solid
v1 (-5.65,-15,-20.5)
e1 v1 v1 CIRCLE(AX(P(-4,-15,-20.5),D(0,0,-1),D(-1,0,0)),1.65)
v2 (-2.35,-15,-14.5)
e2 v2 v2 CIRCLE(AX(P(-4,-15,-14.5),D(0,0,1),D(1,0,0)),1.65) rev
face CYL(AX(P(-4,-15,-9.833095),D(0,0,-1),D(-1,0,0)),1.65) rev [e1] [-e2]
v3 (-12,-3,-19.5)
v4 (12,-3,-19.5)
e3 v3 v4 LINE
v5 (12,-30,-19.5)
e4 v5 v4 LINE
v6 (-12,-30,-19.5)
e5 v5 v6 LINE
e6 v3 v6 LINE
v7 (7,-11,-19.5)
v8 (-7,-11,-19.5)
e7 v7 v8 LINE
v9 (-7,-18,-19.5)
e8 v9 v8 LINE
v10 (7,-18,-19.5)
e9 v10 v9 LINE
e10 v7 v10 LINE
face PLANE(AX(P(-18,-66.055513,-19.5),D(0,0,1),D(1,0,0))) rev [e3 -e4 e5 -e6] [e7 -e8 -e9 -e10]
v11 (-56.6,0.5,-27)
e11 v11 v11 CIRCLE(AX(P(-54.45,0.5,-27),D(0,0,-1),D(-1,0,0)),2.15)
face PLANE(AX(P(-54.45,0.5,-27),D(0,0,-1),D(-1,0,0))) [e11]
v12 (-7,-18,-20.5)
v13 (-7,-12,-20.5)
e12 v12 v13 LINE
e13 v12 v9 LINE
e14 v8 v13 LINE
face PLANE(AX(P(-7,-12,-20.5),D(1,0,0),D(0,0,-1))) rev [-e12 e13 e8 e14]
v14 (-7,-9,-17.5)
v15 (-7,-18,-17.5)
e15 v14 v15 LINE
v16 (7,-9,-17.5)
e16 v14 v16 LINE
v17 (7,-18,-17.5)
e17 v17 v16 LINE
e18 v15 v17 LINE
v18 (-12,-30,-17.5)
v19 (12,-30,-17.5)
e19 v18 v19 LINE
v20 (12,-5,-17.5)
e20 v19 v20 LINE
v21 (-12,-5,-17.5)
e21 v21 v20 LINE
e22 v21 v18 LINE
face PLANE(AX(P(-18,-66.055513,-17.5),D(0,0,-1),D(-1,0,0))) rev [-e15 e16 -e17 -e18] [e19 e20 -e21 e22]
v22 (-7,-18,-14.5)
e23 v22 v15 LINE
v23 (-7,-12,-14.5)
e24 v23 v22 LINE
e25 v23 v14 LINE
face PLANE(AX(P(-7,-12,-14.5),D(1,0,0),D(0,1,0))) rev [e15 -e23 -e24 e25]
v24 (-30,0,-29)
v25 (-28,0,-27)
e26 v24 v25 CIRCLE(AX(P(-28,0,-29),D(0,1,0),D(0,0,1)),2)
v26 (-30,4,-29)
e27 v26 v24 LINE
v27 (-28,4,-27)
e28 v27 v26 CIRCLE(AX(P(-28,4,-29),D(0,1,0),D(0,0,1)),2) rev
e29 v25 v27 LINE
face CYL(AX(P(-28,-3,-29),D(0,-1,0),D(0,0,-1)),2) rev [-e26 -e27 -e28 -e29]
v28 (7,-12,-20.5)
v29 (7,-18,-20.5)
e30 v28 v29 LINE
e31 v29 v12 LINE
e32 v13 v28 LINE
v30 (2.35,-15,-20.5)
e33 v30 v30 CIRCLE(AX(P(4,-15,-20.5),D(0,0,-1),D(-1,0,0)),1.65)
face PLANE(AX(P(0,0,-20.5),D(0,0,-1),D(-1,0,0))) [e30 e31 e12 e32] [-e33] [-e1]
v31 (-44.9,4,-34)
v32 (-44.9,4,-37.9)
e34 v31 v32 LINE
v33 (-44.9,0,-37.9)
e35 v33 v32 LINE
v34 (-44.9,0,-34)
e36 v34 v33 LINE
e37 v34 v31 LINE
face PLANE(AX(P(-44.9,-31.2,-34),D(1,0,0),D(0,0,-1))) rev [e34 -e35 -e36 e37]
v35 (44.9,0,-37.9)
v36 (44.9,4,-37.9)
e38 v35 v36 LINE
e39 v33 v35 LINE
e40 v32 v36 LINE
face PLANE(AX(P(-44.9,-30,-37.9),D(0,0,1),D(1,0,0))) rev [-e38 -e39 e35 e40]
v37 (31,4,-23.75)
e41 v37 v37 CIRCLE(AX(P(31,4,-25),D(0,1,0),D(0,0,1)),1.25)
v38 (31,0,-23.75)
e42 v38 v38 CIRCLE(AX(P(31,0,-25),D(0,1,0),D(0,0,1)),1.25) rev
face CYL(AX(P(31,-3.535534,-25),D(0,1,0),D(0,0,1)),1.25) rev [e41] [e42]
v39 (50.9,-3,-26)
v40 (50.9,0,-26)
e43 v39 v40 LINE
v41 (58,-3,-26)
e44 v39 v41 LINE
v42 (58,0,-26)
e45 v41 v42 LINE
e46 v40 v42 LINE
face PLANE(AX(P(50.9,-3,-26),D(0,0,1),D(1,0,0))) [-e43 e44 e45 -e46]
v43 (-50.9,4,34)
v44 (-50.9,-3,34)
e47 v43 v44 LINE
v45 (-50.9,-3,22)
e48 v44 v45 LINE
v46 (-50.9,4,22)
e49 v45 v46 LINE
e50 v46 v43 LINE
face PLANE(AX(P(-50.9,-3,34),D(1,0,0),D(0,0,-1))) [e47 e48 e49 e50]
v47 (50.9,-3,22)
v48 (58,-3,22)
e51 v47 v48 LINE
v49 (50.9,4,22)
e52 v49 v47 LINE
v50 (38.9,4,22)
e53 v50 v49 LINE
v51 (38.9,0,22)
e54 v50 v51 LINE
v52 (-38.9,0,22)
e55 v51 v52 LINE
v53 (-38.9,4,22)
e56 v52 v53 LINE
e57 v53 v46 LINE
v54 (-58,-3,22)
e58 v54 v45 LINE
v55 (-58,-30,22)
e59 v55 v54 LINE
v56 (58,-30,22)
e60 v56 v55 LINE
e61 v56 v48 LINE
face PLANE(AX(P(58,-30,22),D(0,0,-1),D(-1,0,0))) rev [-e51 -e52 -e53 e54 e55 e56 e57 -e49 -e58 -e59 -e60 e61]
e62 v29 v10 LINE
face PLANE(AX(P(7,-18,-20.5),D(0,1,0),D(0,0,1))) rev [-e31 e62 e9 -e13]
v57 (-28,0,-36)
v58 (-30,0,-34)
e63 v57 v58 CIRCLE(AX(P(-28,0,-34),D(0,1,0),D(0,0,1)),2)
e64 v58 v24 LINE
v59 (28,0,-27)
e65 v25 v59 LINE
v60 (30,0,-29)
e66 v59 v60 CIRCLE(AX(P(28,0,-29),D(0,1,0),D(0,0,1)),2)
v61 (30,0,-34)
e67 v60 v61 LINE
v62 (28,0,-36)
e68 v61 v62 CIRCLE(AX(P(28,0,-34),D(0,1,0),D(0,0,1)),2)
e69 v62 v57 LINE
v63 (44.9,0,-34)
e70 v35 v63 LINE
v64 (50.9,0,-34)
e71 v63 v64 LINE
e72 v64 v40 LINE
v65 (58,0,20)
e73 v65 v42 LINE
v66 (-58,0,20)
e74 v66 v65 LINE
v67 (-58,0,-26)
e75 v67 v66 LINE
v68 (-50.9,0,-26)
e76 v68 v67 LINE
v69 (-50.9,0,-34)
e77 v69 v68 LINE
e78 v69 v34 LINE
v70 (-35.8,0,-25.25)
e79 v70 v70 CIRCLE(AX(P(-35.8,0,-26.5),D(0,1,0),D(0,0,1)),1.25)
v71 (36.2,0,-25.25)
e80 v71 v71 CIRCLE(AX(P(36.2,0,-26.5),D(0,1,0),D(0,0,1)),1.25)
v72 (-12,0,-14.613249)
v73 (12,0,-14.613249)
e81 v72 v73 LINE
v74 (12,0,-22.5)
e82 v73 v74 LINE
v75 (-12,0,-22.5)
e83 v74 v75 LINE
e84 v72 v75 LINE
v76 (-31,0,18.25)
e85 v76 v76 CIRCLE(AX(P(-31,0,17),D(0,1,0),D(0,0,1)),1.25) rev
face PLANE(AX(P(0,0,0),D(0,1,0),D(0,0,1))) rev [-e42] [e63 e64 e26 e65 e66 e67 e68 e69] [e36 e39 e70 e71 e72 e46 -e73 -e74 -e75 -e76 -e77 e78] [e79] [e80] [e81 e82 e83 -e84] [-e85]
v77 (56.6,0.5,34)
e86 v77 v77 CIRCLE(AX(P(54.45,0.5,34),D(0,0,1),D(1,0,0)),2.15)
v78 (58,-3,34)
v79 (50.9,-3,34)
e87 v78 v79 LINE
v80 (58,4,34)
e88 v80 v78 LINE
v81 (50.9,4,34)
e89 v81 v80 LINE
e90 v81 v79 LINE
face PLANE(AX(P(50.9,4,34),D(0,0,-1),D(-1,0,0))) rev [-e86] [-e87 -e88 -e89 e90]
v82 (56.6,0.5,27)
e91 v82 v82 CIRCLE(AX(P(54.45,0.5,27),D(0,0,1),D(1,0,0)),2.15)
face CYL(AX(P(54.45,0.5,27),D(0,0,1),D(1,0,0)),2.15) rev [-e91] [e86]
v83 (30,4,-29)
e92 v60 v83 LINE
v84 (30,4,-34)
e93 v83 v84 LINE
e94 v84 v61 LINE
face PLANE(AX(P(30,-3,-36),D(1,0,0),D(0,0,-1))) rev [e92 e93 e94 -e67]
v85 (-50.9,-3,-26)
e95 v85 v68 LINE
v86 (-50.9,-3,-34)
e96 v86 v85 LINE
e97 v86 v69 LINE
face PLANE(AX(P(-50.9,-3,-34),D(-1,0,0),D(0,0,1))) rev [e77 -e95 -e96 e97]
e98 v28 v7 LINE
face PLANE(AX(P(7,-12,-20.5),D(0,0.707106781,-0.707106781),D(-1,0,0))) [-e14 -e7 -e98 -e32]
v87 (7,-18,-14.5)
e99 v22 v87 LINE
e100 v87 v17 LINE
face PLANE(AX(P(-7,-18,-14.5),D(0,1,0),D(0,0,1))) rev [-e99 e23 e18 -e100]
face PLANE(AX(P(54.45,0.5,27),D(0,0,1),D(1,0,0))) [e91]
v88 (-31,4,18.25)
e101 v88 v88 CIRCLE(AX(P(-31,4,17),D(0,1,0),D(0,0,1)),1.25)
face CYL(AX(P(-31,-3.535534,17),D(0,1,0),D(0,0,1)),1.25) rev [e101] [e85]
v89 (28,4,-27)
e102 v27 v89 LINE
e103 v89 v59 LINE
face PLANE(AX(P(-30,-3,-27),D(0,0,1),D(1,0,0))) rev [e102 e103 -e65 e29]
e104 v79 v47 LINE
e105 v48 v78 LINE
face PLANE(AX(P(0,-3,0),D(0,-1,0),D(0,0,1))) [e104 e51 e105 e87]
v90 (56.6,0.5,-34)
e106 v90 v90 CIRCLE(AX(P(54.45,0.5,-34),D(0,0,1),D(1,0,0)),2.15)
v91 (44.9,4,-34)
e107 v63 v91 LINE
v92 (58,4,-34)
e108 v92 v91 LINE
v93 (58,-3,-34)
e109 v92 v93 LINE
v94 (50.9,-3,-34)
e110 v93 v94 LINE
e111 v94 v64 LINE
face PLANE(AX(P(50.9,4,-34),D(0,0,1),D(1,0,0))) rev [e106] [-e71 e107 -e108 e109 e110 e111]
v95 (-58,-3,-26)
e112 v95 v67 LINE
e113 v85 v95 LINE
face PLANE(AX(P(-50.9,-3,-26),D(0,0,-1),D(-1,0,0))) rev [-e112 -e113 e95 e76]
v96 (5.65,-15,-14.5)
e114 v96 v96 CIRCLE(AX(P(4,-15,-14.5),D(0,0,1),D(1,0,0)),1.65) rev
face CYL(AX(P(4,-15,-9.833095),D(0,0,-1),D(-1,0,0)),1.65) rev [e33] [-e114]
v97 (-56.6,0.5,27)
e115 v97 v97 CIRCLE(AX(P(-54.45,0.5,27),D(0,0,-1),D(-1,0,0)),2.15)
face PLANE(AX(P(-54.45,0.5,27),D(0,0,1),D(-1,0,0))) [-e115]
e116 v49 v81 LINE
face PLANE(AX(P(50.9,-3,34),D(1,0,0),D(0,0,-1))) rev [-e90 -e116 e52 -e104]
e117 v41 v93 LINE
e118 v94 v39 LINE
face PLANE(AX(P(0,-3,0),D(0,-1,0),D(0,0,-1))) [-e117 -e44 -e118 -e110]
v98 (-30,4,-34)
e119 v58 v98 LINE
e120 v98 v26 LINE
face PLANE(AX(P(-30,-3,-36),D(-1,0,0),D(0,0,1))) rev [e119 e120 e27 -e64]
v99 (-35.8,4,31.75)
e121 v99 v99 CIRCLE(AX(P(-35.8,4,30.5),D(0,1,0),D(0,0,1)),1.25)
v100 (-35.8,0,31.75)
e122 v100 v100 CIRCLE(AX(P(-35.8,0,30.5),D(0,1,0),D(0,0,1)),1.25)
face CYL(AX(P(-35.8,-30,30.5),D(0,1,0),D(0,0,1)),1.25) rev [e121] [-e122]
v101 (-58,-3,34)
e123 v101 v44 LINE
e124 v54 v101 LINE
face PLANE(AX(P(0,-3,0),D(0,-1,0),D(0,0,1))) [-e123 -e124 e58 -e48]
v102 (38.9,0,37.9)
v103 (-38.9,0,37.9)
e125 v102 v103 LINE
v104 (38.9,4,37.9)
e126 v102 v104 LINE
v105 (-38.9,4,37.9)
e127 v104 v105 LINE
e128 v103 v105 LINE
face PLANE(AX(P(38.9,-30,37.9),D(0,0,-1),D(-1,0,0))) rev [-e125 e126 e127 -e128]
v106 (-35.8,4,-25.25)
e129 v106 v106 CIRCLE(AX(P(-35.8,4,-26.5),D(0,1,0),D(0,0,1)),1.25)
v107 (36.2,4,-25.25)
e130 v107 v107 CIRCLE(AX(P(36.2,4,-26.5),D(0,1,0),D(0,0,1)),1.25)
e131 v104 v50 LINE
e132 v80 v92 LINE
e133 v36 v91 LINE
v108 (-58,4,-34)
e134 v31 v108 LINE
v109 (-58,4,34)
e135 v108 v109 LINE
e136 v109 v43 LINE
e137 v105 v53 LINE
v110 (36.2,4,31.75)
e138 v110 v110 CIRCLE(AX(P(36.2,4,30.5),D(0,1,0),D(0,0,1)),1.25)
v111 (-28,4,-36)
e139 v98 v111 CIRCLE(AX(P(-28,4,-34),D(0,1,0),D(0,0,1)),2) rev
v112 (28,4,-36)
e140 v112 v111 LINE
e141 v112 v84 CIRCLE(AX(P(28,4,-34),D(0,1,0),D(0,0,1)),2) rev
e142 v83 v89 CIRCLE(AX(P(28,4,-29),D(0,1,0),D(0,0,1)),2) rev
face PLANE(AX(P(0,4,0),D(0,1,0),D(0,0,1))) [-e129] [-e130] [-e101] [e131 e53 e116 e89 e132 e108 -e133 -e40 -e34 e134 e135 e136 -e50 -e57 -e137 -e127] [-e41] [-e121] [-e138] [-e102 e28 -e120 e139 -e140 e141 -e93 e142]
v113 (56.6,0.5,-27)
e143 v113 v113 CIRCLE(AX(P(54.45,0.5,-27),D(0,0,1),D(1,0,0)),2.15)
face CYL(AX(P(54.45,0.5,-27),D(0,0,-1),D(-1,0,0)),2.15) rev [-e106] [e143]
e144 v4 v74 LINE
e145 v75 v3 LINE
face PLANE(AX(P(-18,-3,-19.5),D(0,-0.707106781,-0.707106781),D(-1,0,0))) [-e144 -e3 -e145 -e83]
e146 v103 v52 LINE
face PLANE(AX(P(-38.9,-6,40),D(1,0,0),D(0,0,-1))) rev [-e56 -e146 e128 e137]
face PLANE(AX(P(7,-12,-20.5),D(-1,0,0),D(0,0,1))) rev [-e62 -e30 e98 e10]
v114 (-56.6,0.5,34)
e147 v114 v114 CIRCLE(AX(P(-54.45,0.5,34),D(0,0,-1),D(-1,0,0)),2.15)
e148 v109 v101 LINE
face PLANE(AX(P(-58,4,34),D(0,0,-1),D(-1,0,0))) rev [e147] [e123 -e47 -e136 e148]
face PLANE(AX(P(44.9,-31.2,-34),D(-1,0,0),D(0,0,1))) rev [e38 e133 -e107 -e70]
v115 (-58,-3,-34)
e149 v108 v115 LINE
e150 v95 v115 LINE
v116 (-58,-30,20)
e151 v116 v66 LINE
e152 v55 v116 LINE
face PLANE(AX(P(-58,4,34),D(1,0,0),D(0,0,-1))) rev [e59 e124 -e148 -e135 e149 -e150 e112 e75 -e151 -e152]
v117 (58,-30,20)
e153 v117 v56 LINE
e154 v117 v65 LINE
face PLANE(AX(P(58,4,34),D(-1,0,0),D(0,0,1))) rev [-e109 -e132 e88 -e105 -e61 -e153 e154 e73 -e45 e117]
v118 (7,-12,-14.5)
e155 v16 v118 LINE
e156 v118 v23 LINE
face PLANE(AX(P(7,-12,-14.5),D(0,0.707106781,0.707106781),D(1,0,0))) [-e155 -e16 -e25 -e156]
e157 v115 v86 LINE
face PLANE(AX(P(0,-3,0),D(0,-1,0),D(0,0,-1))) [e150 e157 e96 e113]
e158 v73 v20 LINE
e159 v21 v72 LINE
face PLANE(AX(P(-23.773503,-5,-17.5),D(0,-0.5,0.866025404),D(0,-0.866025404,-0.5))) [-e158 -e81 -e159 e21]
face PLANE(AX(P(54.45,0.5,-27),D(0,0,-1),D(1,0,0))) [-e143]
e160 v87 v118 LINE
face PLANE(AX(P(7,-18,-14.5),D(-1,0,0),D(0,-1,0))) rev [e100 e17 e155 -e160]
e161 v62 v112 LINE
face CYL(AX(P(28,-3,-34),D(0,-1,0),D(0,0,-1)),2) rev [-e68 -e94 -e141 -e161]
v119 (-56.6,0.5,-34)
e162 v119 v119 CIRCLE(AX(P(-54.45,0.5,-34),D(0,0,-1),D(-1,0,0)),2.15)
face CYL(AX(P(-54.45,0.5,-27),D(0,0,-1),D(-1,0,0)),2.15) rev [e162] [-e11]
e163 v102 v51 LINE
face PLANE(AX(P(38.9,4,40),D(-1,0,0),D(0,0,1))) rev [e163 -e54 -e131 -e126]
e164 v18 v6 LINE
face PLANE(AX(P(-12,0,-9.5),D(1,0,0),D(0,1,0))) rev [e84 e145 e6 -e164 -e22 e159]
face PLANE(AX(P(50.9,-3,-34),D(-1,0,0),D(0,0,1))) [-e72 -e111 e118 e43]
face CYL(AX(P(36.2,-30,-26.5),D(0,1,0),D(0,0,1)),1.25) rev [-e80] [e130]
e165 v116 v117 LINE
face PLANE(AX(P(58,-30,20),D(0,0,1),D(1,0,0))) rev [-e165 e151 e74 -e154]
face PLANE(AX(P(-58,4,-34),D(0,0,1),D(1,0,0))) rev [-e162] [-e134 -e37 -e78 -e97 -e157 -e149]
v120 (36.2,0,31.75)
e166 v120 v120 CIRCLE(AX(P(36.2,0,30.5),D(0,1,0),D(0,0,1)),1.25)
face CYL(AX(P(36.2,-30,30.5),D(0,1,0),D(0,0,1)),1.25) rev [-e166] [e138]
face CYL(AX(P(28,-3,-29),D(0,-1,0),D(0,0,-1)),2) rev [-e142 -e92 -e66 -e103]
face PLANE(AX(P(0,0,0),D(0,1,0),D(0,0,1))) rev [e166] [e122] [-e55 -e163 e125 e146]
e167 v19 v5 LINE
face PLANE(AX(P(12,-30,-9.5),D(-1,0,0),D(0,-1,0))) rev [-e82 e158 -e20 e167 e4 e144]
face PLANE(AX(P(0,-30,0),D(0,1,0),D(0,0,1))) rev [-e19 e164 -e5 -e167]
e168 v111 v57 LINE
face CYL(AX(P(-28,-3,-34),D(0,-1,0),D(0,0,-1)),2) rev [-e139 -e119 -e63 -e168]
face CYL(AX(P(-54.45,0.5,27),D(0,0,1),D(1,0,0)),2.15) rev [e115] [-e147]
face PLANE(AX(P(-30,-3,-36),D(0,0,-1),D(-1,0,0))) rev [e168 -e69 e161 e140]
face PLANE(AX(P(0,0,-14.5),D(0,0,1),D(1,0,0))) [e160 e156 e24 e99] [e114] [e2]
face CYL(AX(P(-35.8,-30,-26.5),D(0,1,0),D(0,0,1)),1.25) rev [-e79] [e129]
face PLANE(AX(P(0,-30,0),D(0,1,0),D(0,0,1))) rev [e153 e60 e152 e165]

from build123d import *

# Parameters (mm, degrees)
BOSS_EXTRUDE1_DEPTH             = 4
SKETCH3_W                       = 7.1
SKETCH3_H                       = 8
BOSS_EXTRUDE3_DEPTH             = 3
SKETCH4_R                       = 2.15
CUT_EXTRUDE1_DEPTH              = 7
MIRROR2_COPY_1_SKETCH_W         = 7.1
MIRROR2_COPY_1_SKETCH_H         = 8
MIRROR2_COPY_1_DEPTH            = 3
MIRROR2_COPY_2_SKETCH_R         = 2.15
MIRROR2_COPY_2_DEPTH            = 7
SKETCH5_W                       = 60
SKETCH5_H                       = 9
CUT_EXTRUDE2_DEPTH              = 72.37226352
FILLET1_R                       = 2
SKETCH7_W                       = 101.8
SKETCH7_H                       = 1
CUT_EXTRUDE3_DEPTH              = 72.37226352
SKETCH8_W                       = 116
SKETCH8_H                       = 2
BOSS_EXTRUDE4_DEPTH             = 30
SKETCH9_W                       = 12
SKETCH9_H                       = 18
CUT_EXTRUDE4_DEPTH              = 10
SKETCH10_W                      = 7.1
SKETCH10_H                      = 4
BOSS_EXTRUDE5_DEPTH             = 3
SKETCH12_W                      = 1.5
SKETCH12_H                      = 4
BOSS_EXTRUDE6_DEPTH             = 2
SKETCH13_W                      = 36
SKETCH13_H                      = 2
BOSS_EXTRUDE7_DEPTH             = 30
SKETCH14_W                      = 1.5
SKETCH14_H                      = 4
BOSS_EXTRUDE8_DEPTH             = 1
BOSS_EXTRUDE9_REACH             = 79.055
BOSS_EXTRUDE9_DIRECTION_2_REACH = 79.055
SKETCH16_W                      = 20
SKETCH16_H                      = 28
SKETCH16_W_2                    = 14.6
SKETCH16_H_2                    = 9.2
BOSS_EXTRUDE10_DEPTH            = 2.6
SKETCH17_W                      = 12
SKETCH17_H                      = 18
CUT_EXTRUDE5_DEPTH              = 78.054785705
SKETCH18_W                      = 6
SKETCH18_H                      = 6
CUT_EXTRUDE6_DEPTH              = 79.759380394
SKETCH22_R                      = 1.25
CUT_EXTRUDE7_DEPTH              = 4
SKETCH25_W                      = 6
SKETCH25_H                      = 30
CUT_EXTRUDE11_DEPTH             = 10
CUT_EXTRUDE12_DEPTH             = 78.810282097
CUT_EXTRUDE12_DEPTH_BACK        = 78.810282097
SKETCH26_W                      = 6.843369225
SKETCH26_H                      = 31.263319976
SKETCH26_W_2                    = 6.53419365
SKETCH26_H_2                    = 28.524331859
SKETCH27_R                      = 1.25
CUT_EXTRUDE13_DEPTH             = 79.230428862
SKETCH28_W                      = 89.8
SKETCH28_H                      = 0.6
SKETCH28_W_2                    = 77.8
CUT_EXTRUDE14_DEPTH             = 79.230428862
CHAMFER1_SIZE                   = 2
SKETCH29_W                      = 20
SKETCH29_H                      = 28
CUT_EXTRUDE15_DEPTH             = 17.4
CUT_EXTRUDE16_DEPTH             = 2
SKETCH30_W                      = 89.8
SKETCH30_H                      = 1.5
SKETCH30_W_2                    = 77.8
CUT_EXTRUDE17_DEPTH             = 78.925348892
SKETCH32_W                      = 14
SKETCH32_H                      = 6
BOSS_EXTRUDE11_DEPTH            = 1
CHAMFER2_SIZE                   = 1
SKETCH34_W                      = 14
SKETCH34_H                      = 6
BOSS_EXTRUDE12_DEPTH            = 3
CHAMFER3_SIZE                   = 3
SKETCH33_R                      = 1.65
CUT_EXTRUDE18_DEPTH             = 6
CHAMFER4_SIZE                   = 3


with BuildPart() as part:
    # Sketch1 → Boss-Extrude1 (new body)
    with BuildSketch(Plane(origin=(0, 0, 0), x_dir=(1, 0, 0), z_dir=(0, 1, 0))):
        Polygon((-58, -34), (-50.9, -34), (-50.9, -41), (50.9, -41), (50.9, -34), (58, -34), (58, 34), (50.9, 34), (50.9, 41), (-50.9, 41), (-50.9, 34), (-58, 34), align=None)
    extrude(amount=BOSS_EXTRUDE1_DEPTH)

    # Sketch3 → Boss-Extrude3 (add)
    with BuildSketch(Plane.XZ):
        with Locations((-54.45, -30)):
            Rectangle(SKETCH3_W, SKETCH3_H)
    boss_extrude3 = extrude(amount=BOSS_EXTRUDE3_DEPTH)

    # Sketch4 → Cut-Extrude1 (cut)
    with BuildSketch(Plane(origin=(0, 0, -34), x_dir=(-1, 0, 0), z_dir=(0, 0, -1))):
        with Locations((54.45, 0.5)):
            Circle(SKETCH4_R)
    cut_extrude1 = extrude(amount=-CUT_EXTRUDE1_DEPTH, mode=Mode.SUBTRACT)

    # Mirror1: Boss-Extrude3, Cut-Extrude1 across plane
    add(boss_extrude3.mirror(Plane(origin=(0, 0, 0), x_dir=(0, 0, 1), z_dir=(1, 0, 0))))
    add(cut_extrude1.mirror(Plane(origin=(0, 0, 0), x_dir=(0, 0, 1), z_dir=(1, 0, 0))), mode=Mode.SUBTRACT)

    # Mirror2: Boss-Extrude3, Cut-Extrude1 across plane
    add(boss_extrude3.mirror(Plane.XY))
    add(cut_extrude1.mirror(Plane.XY), mode=Mode.SUBTRACT)

    # Mirror2 copy 1 sketch → Mirror2 copy 1 (add)
    with BuildSketch(Plane(origin=(0, 0, 0), x_dir=(-1, 0, 0), z_dir=(0, -1, 0))):
        with Locations((-54.45, -30)):
            Rectangle(MIRROR2_COPY_1_SKETCH_W, MIRROR2_COPY_1_SKETCH_H)
    extrude(amount=MIRROR2_COPY_1_DEPTH)

    # Mirror2 copy 2 sketch → Mirror2 copy 2 (cut)
    with BuildSketch(Plane.XY.offset(34)):
        with Locations((54.45, 0.5)):
            Circle(MIRROR2_COPY_2_SKETCH_R)
    extrude(amount=-MIRROR2_COPY_2_DEPTH, mode=Mode.SUBTRACT)

    # Sketch5 → Cut-Extrude2 (cut, through all)
    with BuildSketch(Plane(origin=(0, 4, 0), x_dir=(1, 0, 0), z_dir=(0, 1, 0))):
        with Locations((0, 31.5)):
            Rectangle(SKETCH5_W, SKETCH5_H)
    extrude(amount=-CUT_EXTRUDE2_DEPTH, mode=Mode.SUBTRACT)

    # Fillet1
    fillet1_edges = [part.edges().sort_by_distance(p)[0] for p in [
        (-30, 2, -27),
        (-30, 2, -36),
        (30, 2, -36),
        (30, 2, -27),
    ]]
    fillet(fillet1_edges, radius=FILLET1_R)

    # Sketch7 → Cut-Extrude3 (cut, through all)
    with BuildSketch(Plane(origin=(0, 4, 0), x_dir=(1, 0, 0), z_dir=(0, 1, 0))):
        with Locations((0, 40.5)):
            Rectangle(SKETCH7_W, SKETCH7_H)
        with Locations((0, -40.5)):
            Rectangle(SKETCH7_W, SKETCH7_H)
    extrude(amount=-CUT_EXTRUDE3_DEPTH, mode=Mode.SUBTRACT)

    # Sketch8 → Boss-Extrude4 (add)
    with BuildSketch(Plane.XZ):
        with Locations((0, 21)):
            Rectangle(SKETCH8_W, SKETCH8_H)
    extrude(amount=BOSS_EXTRUDE4_DEPTH)

    # Sketch9 → Cut-Extrude4 (cut)
    with BuildSketch(Plane(origin=(0, 4, 0), x_dir=(1, 0, 0), z_dir=(0, 1, 0))):
        with Locations((-44.9, -31)):
            Rectangle(SKETCH9_W, SKETCH9_H)
    extrude(amount=-CUT_EXTRUDE4_DEPTH, mode=Mode.SUBTRACT)

    # Sketch10 → Boss-Extrude5 (add)
    with BuildSketch(Plane.XZ.offset(3)):
        with Locations((-54.45, 24)):
            Rectangle(SKETCH10_W, SKETCH10_H)
        with Locations((54.45, 24)):
            Rectangle(SKETCH10_W, SKETCH10_H)
    extrude(amount=-BOSS_EXTRUDE5_DEPTH)

    # Sketch12 → Boss-Extrude6 (add)
    # profile 1 of 2: a face of its own
    with BuildSketch(Plane.ZY.offset(51)):
        Polygon((22, -5.8), (22, -16.2), (24.7, -13.5), (24.7, -8.5), align=None)
        with Locations((23.35, -11)):
            Rectangle(SKETCH12_W, SKETCH12_H, mode=Mode.SUBTRACT)
    # profile 2 of 2: a face of its own
    with BuildSketch(Plane.ZY.offset(51)):
        Polygon((22, -20.8), (22, -31.2), (24.7, -28.5), (24.7, -23.5), align=None)
        with Locations((23.35, -26)):
            Rectangle(SKETCH12_W, SKETCH12_H, mode=Mode.SUBTRACT)
    boss_extrude6 = extrude(amount=-BOSS_EXTRUDE6_DEPTH)

    # Mirror3: Boss-Extrude6 across plane
    add(boss_extrude6.mirror(Plane(origin=(-44.9, 0, 0), x_dir=(0, 0, 1), z_dir=(1, 0, 0))))

    # Sketch13 → Boss-Extrude7 (add)
    with BuildSketch(Plane.XZ):
        with Locations((0, -18.5)):
            Rectangle(SKETCH13_W, SKETCH13_H)
    extrude(amount=BOSS_EXTRUDE7_DEPTH)

    # Boss-Extrude9: up to this face of the body (flat: up to its plane)
    boss_extrude9_end = Plane(part.part.faces().sort_by_distance((-18, -15, -18.5))[0])
    # Sketch15 → Boss-Extrude9 (add, up to the picked face)
    with BuildSketch(Plane(origin=(0, 0, 0), x_dir=(0, 0, -1), z_dir=(1, 0, 0)), mode=Mode.PRIVATE) as boss_extrude9_sk1:
        Polygon((17.5, 0), (17.5, -5), (14.613248654, 0), align=None)
    boss_extrude9_tool1 = split(extrude(boss_extrude9_sk1.sketch, amount=-BOSS_EXTRUDE9_REACH, mode=Mode.PRIVATE), bisect_by=boss_extrude9_end, keep=Keep.BOTH, mode=Mode.PRIVATE)
    add(boss_extrude9_tool1.solids().sort_by(Axis((0, -1.666667, -16.53775), (-1, 0, 0)))[0])

    # Boss-Extrude9 direction 2: up to this face of the body (flat: up to its plane)
    boss_extrude9_direction_2_end = Plane(part.part.faces().sort_by_distance((18, -15, -18.5))[0])
    # Sketch15 → Boss-Extrude9 direction 2 (add, up to the picked face)
    with BuildSketch(Plane(origin=(0, 0, 0), x_dir=(0, 0, -1), z_dir=(1, 0, 0)), mode=Mode.PRIVATE) as boss_extrude9_direction_2_sk1:
        Polygon((17.5, 0), (17.5, -5), (14.613248654, 0), align=None)
    boss_extrude9_direction_2_tool1 = split(extrude(boss_extrude9_direction_2_sk1.sketch, amount=BOSS_EXTRUDE9_DIRECTION_2_REACH, mode=Mode.PRIVATE), bisect_by=boss_extrude9_direction_2_end, keep=Keep.BOTH, mode=Mode.PRIVATE)
    add(boss_extrude9_direction_2_tool1.solids().sort_by(Axis((0, -1.666667, -16.53775), (1, 0, 0)))[0])

    # Sketch16 → Boss-Extrude10 (add)
    with BuildSketch(Plane.XY.offset(40)):
        with Locations((28, -14)):
            Rectangle(SKETCH16_W, SKETCH16_H)
        with Locations((28, -20.4)):
            Rectangle(SKETCH16_W_2, SKETCH16_H_2, mode=Mode.SUBTRACT)
    extrude(amount=-BOSS_EXTRUDE10_DEPTH)

    # Sketch17 → Cut-Extrude5 (cut, through all)
    with BuildSketch(Plane.XZ):
        with Locations((44.9, 31)):
            Rectangle(SKETCH17_W, SKETCH17_H)
    extrude(amount=-CUT_EXTRUDE5_DEPTH, mode=Mode.SUBTRACT)

    # Sketch18 → Cut-Extrude6 (cut, through all)
    with BuildSketch(Plane(origin=(0, 4, 0), x_dir=(1, 0, 0), z_dir=(0, 1, 0))):
        with Locations((47.9, 37)):
            Rectangle(SKETCH18_W, SKETCH18_H)
        with Locations((-47.9, 37)):
            Rectangle(SKETCH18_W, SKETCH18_H)
    extrude(amount=-CUT_EXTRUDE6_DEPTH, mode=Mode.SUBTRACT)

    # Sketch22 → Cut-Extrude7 (cut)
    with BuildSketch(Plane(origin=(0, 4, 0), x_dir=(1, 0, 0), z_dir=(0, 1, 0))):
        with Locations(Location((31, 25, 0), (0, 0, 270))):
            Circle(SKETCH22_R)
        with Locations(Location((-31, -17, 0), (0, 0, 270))):
            Circle(SKETCH22_R)
    extrude(amount=-CUT_EXTRUDE7_DEPTH, mode=Mode.SUBTRACT)

    # Sketch25 → Cut-Extrude11 (cut)
    with BuildSketch(Plane(origin=(0, 0, -19.5), x_dir=(-1, 0, 0), z_dir=(0, 0, -1))):
        with Locations((-15, -15)):
            Rectangle(SKETCH25_W, SKETCH25_H)
        with Locations((15, -15)):
            Rectangle(SKETCH25_W, SKETCH25_H)
    extrude(amount=-CUT_EXTRUDE11_DEPTH, mode=Mode.SUBTRACT)

    # Sketch26 → Cut-Extrude12 (cut, two sides: drawn at the far end of the back side and taken through both)
    with BuildSketch(Plane.ZY.offset(1).offset(-CUT_EXTRUDE12_DEPTH_BACK)):
        with Locations((-23.779868126, -20.73082856)):
            Rectangle(SKETCH26_W, SKETCH26_H)
        with Locations((25.267096825, -20.06216593)):
            Rectangle(SKETCH26_W_2, SKETCH26_H_2)
    extrude(amount=CUT_EXTRUDE12_DEPTH + CUT_EXTRUDE12_DEPTH_BACK, mode=Mode.SUBTRACT)

    # Sketch27 → Cut-Extrude13 (cut, through all)
    with BuildSketch(Plane(origin=(0, 4, 0), x_dir=(1, 0, 0), z_dir=(0, 1, 0))):
        with Locations(Location((-35.8, 26.5, 0), (0, 0, 270))):
            Circle(SKETCH27_R)
        with Locations(Location((-35.8, -30.5, 0), (0, 0, 270))):
            Circle(SKETCH27_R)
        with Locations(Location((36.2, -30.5, 0), (0, 0, 270))):
            Circle(SKETCH27_R)
        with Locations(Location((36.2, 26.5, 0), (0, 0, 270))):
            Circle(SKETCH27_R)
    extrude(amount=-CUT_EXTRUDE13_DEPTH, mode=Mode.SUBTRACT)

    # Sketch28 → Cut-Extrude14 (cut, through all)
    with BuildSketch(Plane(origin=(0, 4, 0), x_dir=(1, 0, 0), z_dir=(0, 1, 0))):
        with Locations((0, 39.7)):
            Rectangle(SKETCH28_W, SKETCH28_H)
        with Locations((0, -39.7)):
            Rectangle(SKETCH28_W_2, SKETCH28_H)
    extrude(amount=-CUT_EXTRUDE14_DEPTH, mode=Mode.SUBTRACT)

    # Chamfer1
    chamfer1_edges = [part.edges().sort_by_distance(p)[0] for p in [
        (28, 0, 37.4),
    ]]
    chamfer(chamfer1_edges, length=CHAMFER1_SIZE)

    # Sketch29 → Cut-Extrude15 (cut)
    with BuildSketch(Plane.XY.offset(39.4)):
        with Locations((28, -14)):
            Rectangle(SKETCH29_W, SKETCH29_H)
    extrude(amount=-CUT_EXTRUDE15_DEPTH, mode=Mode.SUBTRACT)

    # Sketch30 → Cut-Extrude17 (cut, through all)
    with BuildSketch(Plane(origin=(0, 4, 0), x_dir=(1, 0, 0), z_dir=(0, 1, 0))):
        with Locations((0, 38.65)):
            Rectangle(SKETCH30_W, SKETCH30_H)
        with Locations((0, -38.65)):
            Rectangle(SKETCH30_W_2, SKETCH30_H)
    extrude(amount=-CUT_EXTRUDE17_DEPTH, mode=Mode.SUBTRACT)

    # Sketch32 → Boss-Extrude11 (add)
    with BuildSketch(Plane(origin=(0, 0, -19.5), x_dir=(-1, 0, 0), z_dir=(0, 0, -1))):
        with Locations((0, -15)):
            Rectangle(SKETCH32_W, SKETCH32_H)
    extrude(amount=BOSS_EXTRUDE11_DEPTH)

    # Chamfer2
    chamfer2_edges = [part.edges().sort_by_distance(p)[0] for p in [
        (0, -12, -19.5),
    ]]
    chamfer(chamfer2_edges, length=CHAMFER2_SIZE - 0.0001)  # a hair under: the kernel refuses the full size

    # Sketch34 → Boss-Extrude12 (add)
    with BuildSketch(Plane.XY.offset(-17.5)):
        with Locations((0, -15)):
            Rectangle(SKETCH34_W, SKETCH34_H)
    extrude(amount=BOSS_EXTRUDE12_DEPTH)

    # Chamfer3
    chamfer3_edges = [part.edges().sort_by_distance(p)[0] for p in [
        (0, -12, -17.5),
    ]]
    chamfer(chamfer3_edges, length=CHAMFER3_SIZE - 0.0001)  # a hair under: the kernel refuses the full size

    # Sketch33 → Cut-Extrude18 (cut)
    with BuildSketch(Plane(origin=(0, 0, -20.5), x_dir=(-1, 0, 0), z_dir=(0, 0, -1))):
        with Locations((4, -15)):
            Circle(SKETCH33_R)
        with Locations((-4, -15)):
            Circle(SKETCH33_R)
    extrude(amount=-CUT_EXTRUDE18_DEPTH, mode=Mode.SUBTRACT)

    # Chamfer4
    chamfer4_edges = [part.edges().sort_by_distance(p)[0] for p in [
        (0, 0, -19.5),
    ]]
    chamfer(chamfer4_edges, length=CHAMFER4_SIZE)


with BuildPart() as body_2:
    # Sketch14 → Boss-Extrude8 (new, symmetric)
    with BuildSketch(Plane(origin=(0, 0, 0), x_dir=(0, 0, -1), z_dir=(1, 0, 0))):
        Polygon((24.2, -8.5), (21.5, -5.8), (21.5, -16.2), (24.2, -13.5), align=None)
        with Locations((22.85, -11)):
            Rectangle(SKETCH14_W, SKETCH14_H, mode=Mode.SUBTRACT)
    extrude(amount=BOSS_EXTRUDE8_DEPTH, both=True)

    # Sketch31 → Cut-Extrude16 (cut)
    with BuildSketch(Plane.ZY.offset(1)):
        Polygon((-24.2, -8.5), (-24.2, -13.5), (-21.5, -16.2), (-21.5, -5.8), align=None)
    extrude(amount=-CUT_EXTRUDE16_DEPTH, mode=Mode.SUBTRACT)


solid = part.part
